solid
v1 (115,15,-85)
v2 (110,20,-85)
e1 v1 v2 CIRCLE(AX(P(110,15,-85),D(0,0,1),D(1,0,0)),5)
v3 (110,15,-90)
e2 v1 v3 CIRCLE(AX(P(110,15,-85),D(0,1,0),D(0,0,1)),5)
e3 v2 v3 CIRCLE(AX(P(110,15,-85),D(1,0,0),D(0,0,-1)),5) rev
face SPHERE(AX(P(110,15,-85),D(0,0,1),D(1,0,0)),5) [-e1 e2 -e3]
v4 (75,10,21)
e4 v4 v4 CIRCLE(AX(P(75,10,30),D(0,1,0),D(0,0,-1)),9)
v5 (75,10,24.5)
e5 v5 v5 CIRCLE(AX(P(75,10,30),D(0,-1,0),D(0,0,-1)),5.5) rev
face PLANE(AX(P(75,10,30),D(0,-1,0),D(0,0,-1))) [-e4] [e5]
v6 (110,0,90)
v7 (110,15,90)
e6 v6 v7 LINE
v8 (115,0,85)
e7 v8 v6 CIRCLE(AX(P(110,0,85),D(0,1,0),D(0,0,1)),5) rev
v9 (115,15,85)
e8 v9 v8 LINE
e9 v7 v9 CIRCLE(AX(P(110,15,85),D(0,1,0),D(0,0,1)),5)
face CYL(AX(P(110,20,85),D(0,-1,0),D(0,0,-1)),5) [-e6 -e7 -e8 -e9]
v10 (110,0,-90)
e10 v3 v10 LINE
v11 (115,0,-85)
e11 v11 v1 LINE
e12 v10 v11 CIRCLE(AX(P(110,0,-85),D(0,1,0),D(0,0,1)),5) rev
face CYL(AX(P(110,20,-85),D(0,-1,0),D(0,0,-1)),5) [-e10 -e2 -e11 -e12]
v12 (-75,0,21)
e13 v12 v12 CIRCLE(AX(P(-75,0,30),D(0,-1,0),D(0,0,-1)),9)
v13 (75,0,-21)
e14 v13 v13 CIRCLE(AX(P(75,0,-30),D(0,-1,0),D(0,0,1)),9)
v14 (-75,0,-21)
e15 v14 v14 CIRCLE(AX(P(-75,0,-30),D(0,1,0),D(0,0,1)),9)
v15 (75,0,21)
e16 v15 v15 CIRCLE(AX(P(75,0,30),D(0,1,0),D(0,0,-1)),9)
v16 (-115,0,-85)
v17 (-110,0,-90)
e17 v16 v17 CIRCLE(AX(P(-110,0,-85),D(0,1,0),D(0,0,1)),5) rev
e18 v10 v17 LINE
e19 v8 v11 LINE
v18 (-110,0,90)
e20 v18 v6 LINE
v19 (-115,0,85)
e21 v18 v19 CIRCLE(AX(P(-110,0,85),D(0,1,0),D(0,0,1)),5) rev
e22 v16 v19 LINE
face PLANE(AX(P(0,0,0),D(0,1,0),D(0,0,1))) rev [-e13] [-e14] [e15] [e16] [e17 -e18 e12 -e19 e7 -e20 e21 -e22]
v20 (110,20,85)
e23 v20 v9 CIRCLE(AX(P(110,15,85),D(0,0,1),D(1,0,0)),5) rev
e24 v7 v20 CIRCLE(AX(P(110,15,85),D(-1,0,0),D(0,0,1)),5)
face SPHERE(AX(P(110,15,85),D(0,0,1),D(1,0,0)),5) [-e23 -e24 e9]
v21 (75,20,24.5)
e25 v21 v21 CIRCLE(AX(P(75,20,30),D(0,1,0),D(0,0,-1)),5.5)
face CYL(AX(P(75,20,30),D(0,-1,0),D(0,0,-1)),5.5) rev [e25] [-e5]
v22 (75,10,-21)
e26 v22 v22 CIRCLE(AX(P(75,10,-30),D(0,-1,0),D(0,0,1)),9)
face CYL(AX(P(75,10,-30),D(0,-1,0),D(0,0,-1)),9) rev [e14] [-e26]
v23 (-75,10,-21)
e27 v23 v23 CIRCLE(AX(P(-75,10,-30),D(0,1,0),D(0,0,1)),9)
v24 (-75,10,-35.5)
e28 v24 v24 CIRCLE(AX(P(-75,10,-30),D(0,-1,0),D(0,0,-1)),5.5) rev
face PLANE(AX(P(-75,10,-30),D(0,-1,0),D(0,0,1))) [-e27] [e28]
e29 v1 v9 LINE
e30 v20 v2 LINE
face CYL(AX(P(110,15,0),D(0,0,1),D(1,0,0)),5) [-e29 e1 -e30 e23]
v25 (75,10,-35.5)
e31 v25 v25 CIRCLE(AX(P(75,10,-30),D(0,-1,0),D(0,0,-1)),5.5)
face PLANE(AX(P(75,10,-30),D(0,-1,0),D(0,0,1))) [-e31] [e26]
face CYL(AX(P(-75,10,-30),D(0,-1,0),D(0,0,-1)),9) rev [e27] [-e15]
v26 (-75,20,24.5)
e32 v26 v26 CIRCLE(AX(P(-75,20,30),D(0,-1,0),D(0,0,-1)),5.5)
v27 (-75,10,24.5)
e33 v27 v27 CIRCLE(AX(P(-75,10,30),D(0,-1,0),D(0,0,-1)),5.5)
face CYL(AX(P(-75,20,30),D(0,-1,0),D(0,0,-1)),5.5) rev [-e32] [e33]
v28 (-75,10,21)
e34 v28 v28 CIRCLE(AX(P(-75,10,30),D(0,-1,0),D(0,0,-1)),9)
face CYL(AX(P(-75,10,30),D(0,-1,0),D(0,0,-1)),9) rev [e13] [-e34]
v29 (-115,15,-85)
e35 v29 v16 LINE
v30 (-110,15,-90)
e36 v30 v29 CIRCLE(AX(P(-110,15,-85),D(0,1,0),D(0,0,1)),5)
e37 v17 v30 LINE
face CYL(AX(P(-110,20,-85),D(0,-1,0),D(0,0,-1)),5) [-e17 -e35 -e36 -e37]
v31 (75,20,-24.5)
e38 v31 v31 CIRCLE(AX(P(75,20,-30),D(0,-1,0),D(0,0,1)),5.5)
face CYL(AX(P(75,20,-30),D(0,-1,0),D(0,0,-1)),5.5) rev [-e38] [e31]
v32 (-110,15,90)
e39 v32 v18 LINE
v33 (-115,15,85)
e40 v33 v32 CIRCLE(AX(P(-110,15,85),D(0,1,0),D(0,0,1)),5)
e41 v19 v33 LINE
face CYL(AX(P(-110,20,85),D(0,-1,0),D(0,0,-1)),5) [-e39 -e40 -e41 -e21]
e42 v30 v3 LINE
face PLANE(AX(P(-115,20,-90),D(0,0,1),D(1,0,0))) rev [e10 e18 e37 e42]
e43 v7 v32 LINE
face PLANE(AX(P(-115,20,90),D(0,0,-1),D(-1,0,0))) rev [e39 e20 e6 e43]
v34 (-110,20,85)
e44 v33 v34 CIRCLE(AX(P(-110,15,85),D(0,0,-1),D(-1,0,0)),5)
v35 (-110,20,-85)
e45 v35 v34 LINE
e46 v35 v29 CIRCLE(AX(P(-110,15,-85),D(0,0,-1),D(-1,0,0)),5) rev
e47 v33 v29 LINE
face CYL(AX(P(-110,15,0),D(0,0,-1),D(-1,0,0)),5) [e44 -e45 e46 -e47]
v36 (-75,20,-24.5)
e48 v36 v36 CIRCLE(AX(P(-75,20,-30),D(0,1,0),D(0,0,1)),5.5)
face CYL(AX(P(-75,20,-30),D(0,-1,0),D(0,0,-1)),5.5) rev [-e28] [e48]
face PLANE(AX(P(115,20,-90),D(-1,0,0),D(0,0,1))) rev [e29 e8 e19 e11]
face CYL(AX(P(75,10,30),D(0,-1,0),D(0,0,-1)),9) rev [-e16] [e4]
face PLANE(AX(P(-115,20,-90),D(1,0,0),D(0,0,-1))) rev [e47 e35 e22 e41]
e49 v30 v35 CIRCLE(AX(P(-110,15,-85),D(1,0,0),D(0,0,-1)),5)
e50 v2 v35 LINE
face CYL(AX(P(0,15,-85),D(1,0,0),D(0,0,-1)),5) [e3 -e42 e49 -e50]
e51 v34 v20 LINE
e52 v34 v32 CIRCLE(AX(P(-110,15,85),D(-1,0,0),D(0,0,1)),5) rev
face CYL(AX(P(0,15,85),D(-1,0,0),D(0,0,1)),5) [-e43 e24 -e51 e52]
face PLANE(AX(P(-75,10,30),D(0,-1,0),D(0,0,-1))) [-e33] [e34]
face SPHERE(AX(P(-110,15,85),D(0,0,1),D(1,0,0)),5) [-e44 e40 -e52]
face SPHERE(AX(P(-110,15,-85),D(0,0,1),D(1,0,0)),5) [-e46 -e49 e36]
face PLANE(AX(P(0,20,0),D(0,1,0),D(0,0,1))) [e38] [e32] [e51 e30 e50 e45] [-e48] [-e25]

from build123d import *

# Parameters (mm, degrees)
SKETCH1_W               = 230
SKETCH1_H               = 180
BOSS_EXTRUDE1_DEPTH     = 20
FILLET1_R               = 5
SKETCH2_R               = 9
CUT_EXTRUDE1_DEPTH      = 10
SKETCH2_3_R             = 5.5
CUT_EXTRUDE2_DEPTH      = 148.39402973
MIRROR2_COPY_1_SKETCH_R = 9
MIRROR2_COPY_1_DEPTH    = 10
MIRROR2_COPY_2_SKETCH_R = 5.5
MIRROR2_COPY_2_DEPTH    = 148.39402973
FILLET2_R               = 5


with BuildPart() as part:
    # Sketch1 → Boss-Extrude1 (new body)
    with BuildSketch(Plane(origin=(0, 0, 0), x_dir=(1, 0, 0), z_dir=(0, 1, 0))):
        Rectangle(SKETCH1_W, SKETCH1_H)
    extrude(amount=BOSS_EXTRUDE1_DEPTH)

    # Fillet1
    fillet1_edges = [part.edges().sort_by_distance(p)[0] for p in [
        (-115, 20, 0),
        (0, 20, 90),
        (115, 20, 0),
        (0, 20, -90),
    ]]
    fillet(fillet1_edges, radius=FILLET1_R)

    # Sketch2 → Cut-Extrude1 (cut)
    with BuildSketch(Plane.XZ):
        with Locations(Location((-75, 30, 0), (0, 0, 270))):
            Circle(SKETCH2_R)
    cut_extrude1 = extrude(amount=-CUT_EXTRUDE1_DEPTH, mode=Mode.SUBTRACT)

    # Sketch2<3> → Cut-Extrude2 (cut, through all)
    with BuildSketch(Plane.XZ):
        with Locations(Location((-75, 30, 0), (0, 0, 270))):
            Circle(SKETCH2_3_R)
    cut_extrude2 = extrude(amount=-CUT_EXTRUDE2_DEPTH, mode=Mode.SUBTRACT)

    # Mirror1: Cut-Extrude1, Cut-Extrude2 across plane
    add(cut_extrude1.mirror(Plane(origin=(0, 0, 0), x_dir=(0, 0, 1), z_dir=(1, 0, 0))), mode=Mode.SUBTRACT)
    add(cut_extrude2.mirror(Plane(origin=(0, 0, 0), x_dir=(0, 0, 1), z_dir=(1, 0, 0))), mode=Mode.SUBTRACT)

    # Mirror2: Cut-Extrude1, Cut-Extrude2 across plane
    add(cut_extrude1.mirror(Plane.XY), mode=Mode.SUBTRACT)
    add(cut_extrude2.mirror(Plane.XY), mode=Mode.SUBTRACT)

    # Mirror2 copy 1 sketch → Mirror2 copy 1 (cut)
    with BuildSketch(Plane(origin=(0, 0, 0), x_dir=(-1, 0, 0), z_dir=(0, -1, 0))):
        with Locations(Location((-75, 30, 0), (0, 0, 270))):
            Circle(MIRROR2_COPY_1_SKETCH_R)
    extrude(amount=-MIRROR2_COPY_1_DEPTH, mode=Mode.SUBTRACT)

    # Mirror2 copy 2 sketch → Mirror2 copy 2 (cut, through all)
    with BuildSketch(Plane(origin=(0, 0, 0), x_dir=(-1, 0, 0), z_dir=(0, -1, 0))):
        with Locations(Location((-75, 30, 0), (0, 0, 270))):
            Circle(MIRROR2_COPY_2_SKETCH_R)
    extrude(amount=-MIRROR2_COPY_2_DEPTH, mode=Mode.SUBTRACT)

    # Fillet2
    # the kernel refuses this fillet: 5 mm, written as the material it takes off along each edge
    with BuildSketch(Plane(origin=(-110, 15, -85), x_dir=(-1, 0, 0), z_dir=(0, 0, -1))) as fillet2_piece_1_section:
        Polygon((0, 0), (FILLET2_R, 0), (FILLET2_R, FILLET2_R), (0, FILLET2_R), align=None)
    fillet2_piece_1 = extrude(amount=FILLET2_R, mode=Mode.PRIVATE)
    fillet2_piece_1 = fillet2_piece_1 - Plane(origin=(-110, 15, -85), x_dir=(0.7071067811865475, -0.7071067811865475, 0), z_dir=(0, 0, -1)) * Sphere(FILLET2_R, mode=Mode.PRIVATE)
    add(fillet2_piece_1, mode=Mode.SUBTRACT)
    with BuildSketch(Plane(origin=(110, 15, -85), x_dir=(1, 0, 0), z_dir=(0, 0, -1))) as fillet2_piece_2_section:
        Polygon((0, 0), (FILLET2_R, 0), (FILLET2_R, -FILLET2_R), (0, -FILLET2_R), align=None)
    fillet2_piece_2 = extrude(amount=FILLET2_R, mode=Mode.PRIVATE)
    fillet2_piece_2 = fillet2_piece_2 - Plane(origin=(110, 15, -85), x_dir=(-0.7071067811865475, -0.7071067811865475, 0), z_dir=(0, 0, -1)) * Sphere(FILLET2_R, mode=Mode.PRIVATE)
    add(fillet2_piece_2, mode=Mode.SUBTRACT)
    with BuildSketch(Plane(origin=(-110, 15, 85), x_dir=(0, 0, 1), z_dir=(-1, 0, 0))) as fillet2_piece_3_section:
        Polygon((0, 0), (FILLET2_R, 0), (FILLET2_R, FILLET2_R), (0, FILLET2_R), align=None)
    fillet2_piece_3 = extrude(amount=FILLET2_R, mode=Mode.PRIVATE)
    fillet2_piece_3 = fillet2_piece_3 - Plane(origin=(-110, 15, 85), x_dir=(0, -0.7071067811865475, -0.7071067811865475), z_dir=(-1, 0, 0)) * Sphere(FILLET2_R, mode=Mode.PRIVATE)
    add(fillet2_piece_3, mode=Mode.SUBTRACT)
    with BuildSketch(Plane(origin=(110, 15, 85), x_dir=(0, 0, 1), z_dir=(1, 0, 0))) as fillet2_piece_4_section:
        Polygon((0, 0), (FILLET2_R, 0), (FILLET2_R, -FILLET2_R), (0, -FILLET2_R), align=None)
    fillet2_piece_4 = extrude(amount=FILLET2_R, mode=Mode.PRIVATE)
    fillet2_piece_4 = fillet2_piece_4 - Plane(origin=(110, 15, 85), x_dir=(0, -0.7071067811865475, -0.7071067811865475), z_dir=(1, 0, 0)) * Sphere(FILLET2_R, mode=Mode.PRIVATE)
    add(fillet2_piece_4, mode=Mode.SUBTRACT)
    with BuildSketch(Plane(origin=(115, -12.5, 90), x_dir=(0, 0, -1), z_dir=(0, 1, 0)), Plane(origin=(115, -12.5, -90), x_dir=(-1, 0, 0), z_dir=(0, 1, 0))) as fillet2_piece_5:
        with BuildLine():
            CenterArc((FILLET2_R, FILLET2_R), FILLET2_R, 180, 90)
            Line((0, FILLET2_R), (0, 0))
            Line((0, 0), (FILLET2_R, 0))
        make_face()
    extrude(amount=27.5, mode=Mode.SUBTRACT)
    with BuildSketch(Plane(origin=(-115, -12.5, 90), x_dir=(0, 0, -1), z_dir=(0, 1, 0)), Plane(origin=(-115, -12.5, -90), x_dir=(1, 0, 0), z_dir=(0, 1, 0))) as fillet2_piece_6:
        with BuildLine():
            CenterArc((FILLET2_R, -FILLET2_R), FILLET2_R, 90, 90)
            Line((0, -FILLET2_R), (0, 0))
            Line((0, 0), (FILLET2_R, 0))
        make_face()
    extrude(amount=27.5, mode=Mode.SUBTRACT)


solid = part.part
